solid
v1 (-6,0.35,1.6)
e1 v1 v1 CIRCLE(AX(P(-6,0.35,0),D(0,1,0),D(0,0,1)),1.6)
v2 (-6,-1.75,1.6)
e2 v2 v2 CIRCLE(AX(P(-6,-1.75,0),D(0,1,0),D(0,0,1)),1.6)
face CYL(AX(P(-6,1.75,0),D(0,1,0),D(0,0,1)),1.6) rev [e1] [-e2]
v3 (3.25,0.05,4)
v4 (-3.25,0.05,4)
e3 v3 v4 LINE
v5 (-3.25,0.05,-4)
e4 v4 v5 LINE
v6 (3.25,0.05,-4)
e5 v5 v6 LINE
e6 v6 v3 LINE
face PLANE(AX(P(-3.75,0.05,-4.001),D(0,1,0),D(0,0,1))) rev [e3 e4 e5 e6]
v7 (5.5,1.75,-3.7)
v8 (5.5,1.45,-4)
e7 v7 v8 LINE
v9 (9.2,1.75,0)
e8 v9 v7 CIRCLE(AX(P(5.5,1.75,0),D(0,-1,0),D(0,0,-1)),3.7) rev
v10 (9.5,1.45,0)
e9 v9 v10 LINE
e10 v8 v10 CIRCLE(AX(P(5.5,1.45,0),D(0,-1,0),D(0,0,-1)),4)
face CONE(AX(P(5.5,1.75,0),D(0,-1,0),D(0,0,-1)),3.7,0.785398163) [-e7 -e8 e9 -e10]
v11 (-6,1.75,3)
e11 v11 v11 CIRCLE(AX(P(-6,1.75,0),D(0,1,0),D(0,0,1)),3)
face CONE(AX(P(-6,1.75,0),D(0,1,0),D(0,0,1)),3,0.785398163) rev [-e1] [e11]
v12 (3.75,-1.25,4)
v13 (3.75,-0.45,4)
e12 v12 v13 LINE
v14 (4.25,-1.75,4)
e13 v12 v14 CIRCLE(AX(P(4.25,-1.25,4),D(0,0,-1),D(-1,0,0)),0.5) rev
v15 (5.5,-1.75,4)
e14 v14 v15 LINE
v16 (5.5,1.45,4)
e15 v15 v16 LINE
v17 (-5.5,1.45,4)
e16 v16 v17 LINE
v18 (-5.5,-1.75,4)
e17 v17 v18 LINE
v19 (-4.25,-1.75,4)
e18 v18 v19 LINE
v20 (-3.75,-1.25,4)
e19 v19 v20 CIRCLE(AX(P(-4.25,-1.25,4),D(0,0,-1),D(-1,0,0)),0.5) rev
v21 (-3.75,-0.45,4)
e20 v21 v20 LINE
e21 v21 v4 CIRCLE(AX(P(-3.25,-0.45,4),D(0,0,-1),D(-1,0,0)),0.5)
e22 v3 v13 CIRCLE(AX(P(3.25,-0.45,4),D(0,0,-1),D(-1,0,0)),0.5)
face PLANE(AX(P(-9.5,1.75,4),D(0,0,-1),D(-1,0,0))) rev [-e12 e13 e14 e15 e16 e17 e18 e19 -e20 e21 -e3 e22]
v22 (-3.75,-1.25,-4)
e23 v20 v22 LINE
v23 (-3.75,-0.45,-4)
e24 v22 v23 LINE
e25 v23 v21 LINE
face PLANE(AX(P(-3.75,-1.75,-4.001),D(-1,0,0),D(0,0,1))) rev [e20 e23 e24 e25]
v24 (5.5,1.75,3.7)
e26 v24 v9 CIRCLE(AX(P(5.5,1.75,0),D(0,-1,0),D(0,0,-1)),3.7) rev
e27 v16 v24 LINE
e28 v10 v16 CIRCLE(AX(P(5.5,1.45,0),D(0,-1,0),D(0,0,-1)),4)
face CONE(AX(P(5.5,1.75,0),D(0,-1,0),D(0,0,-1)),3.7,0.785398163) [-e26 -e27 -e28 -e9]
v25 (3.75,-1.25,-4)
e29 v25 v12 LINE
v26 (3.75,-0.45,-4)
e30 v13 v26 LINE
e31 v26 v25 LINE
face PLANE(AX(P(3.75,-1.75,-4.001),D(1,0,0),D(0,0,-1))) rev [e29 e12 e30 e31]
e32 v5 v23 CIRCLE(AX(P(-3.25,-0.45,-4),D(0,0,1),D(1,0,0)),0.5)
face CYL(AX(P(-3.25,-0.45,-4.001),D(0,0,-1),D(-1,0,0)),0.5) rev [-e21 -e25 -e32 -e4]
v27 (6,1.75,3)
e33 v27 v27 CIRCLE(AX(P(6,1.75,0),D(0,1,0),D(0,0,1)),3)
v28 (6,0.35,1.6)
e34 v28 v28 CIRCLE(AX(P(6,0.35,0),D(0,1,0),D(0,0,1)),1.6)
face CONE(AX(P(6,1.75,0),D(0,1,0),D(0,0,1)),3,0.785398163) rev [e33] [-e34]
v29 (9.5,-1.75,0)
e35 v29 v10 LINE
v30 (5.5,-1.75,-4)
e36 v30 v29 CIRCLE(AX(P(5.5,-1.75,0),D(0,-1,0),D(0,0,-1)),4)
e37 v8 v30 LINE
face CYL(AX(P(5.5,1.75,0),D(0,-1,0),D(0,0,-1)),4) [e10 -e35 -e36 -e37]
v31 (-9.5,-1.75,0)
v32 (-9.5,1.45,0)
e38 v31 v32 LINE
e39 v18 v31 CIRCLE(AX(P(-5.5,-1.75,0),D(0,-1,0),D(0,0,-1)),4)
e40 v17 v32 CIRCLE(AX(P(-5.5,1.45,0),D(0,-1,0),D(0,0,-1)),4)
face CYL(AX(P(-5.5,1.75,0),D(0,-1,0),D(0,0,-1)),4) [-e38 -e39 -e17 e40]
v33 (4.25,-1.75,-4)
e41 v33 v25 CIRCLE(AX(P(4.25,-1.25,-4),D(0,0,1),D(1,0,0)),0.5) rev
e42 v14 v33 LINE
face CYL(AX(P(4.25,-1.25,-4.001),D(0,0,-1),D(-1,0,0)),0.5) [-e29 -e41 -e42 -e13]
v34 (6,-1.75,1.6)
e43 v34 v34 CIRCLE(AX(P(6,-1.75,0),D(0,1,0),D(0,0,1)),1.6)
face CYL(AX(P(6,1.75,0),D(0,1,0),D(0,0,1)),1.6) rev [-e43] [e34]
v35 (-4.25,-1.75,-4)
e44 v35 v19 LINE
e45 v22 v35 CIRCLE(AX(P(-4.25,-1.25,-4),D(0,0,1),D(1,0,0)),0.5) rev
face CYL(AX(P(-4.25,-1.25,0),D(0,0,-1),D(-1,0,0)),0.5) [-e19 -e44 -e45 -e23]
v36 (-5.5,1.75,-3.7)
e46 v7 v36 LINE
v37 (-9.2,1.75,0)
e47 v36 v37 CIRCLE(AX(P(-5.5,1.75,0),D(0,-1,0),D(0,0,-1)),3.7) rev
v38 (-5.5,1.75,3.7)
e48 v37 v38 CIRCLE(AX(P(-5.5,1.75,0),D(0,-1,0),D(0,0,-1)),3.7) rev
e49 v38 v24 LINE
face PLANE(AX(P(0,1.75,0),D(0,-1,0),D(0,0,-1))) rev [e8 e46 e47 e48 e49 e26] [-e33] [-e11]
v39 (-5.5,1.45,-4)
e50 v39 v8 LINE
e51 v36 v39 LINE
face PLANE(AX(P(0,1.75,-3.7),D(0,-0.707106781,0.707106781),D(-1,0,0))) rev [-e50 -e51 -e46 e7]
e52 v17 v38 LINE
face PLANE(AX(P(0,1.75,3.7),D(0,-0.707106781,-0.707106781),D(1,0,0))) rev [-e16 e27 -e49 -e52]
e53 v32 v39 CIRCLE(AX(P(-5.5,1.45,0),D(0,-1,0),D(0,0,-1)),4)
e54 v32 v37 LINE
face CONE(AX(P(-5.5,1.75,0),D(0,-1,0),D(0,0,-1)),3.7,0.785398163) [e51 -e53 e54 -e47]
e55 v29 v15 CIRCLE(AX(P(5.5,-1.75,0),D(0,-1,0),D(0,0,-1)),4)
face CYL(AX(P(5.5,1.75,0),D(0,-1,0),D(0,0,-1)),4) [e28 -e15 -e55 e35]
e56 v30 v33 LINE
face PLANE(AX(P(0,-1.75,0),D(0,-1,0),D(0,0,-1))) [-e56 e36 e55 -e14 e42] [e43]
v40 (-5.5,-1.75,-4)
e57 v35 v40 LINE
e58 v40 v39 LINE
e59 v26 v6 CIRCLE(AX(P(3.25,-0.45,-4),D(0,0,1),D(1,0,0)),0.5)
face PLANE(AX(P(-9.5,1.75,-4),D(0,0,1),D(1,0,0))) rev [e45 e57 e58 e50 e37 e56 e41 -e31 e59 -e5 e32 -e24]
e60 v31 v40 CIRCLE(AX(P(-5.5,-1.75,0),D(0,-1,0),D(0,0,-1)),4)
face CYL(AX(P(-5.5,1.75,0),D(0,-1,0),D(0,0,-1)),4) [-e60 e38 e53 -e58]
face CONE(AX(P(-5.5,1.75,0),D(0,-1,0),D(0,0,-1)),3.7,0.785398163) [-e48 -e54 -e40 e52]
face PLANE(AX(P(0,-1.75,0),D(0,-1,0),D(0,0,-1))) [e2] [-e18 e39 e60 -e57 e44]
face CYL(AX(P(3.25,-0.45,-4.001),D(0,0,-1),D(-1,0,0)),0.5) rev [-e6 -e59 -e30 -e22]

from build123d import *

# Parameters (mm, degrees)
SKETCH_1_W                   = 19
SKETCH_1_H                   = 8
EXTRUDE_1_DEPTH              = 1.75
CUT_EXTRUDE_1_REACH          = 14.542
SKETCH_2_W                   = 7.5
SKETCH_2_H                   = 1.8
HOLE_WIZARD_M3_1_D           = 3.2
HOLE_WIZARD_M3_1_CSINK_D     = 6
HOLE_WIZARD_M3_1_CSINK_ANGLE = 90
FILLET_2_R                   = 4
FILLET_3_R                   = 0.5
CHAMFER_1_SIZE               = 0.3


with BuildPart() as part:
    # 草图1 → 凸台-拉伸1 (new, symmetric)
    with BuildSketch(Plane(origin=(0, 0, 0), x_dir=(1, 0, 0), z_dir=(0, 1, 0))):
        Rectangle(SKETCH_1_W, SKETCH_1_H)
    extrude(amount=EXTRUDE_1_DEPTH, both=True)

    # 草图2 → 切除-拉伸1 (cut, up to next)
    with BuildSketch(Plane.XY.offset(4), mode=Mode.PRIVATE) as cut_extrude_1_sk1:
        with Locations((0, -0.85)):
            Rectangle(SKETCH_2_W, SKETCH_2_H)
    cut_extrude_1_tool1 = extrude(cut_extrude_1_sk1.sketch, amount=-CUT_EXTRUDE_1_REACH, mode=Mode.PRIVATE) & part.part
    add(cut_extrude_1_tool1.solids().sort_by_distance((0, -0.85, 4))[0], mode=Mode.SUBTRACT)

    # M3 十字槽半沉头木螺钉的锥形沉头孔1 (through all)
    with Locations(Plane(origin=(0, 1.75, 0), x_dir=(1, 0, 0), z_dir=(0, 1, 0))):
        with Locations((6, 0), (-6, 0)):
            CounterSinkHole(HOLE_WIZARD_M3_1_D / 2, HOLE_WIZARD_M3_1_CSINK_D / 2, counter_sink_angle=HOLE_WIZARD_M3_1_CSINK_ANGLE)

    # 圆角2
    fillet_2_edges = [part.edges().sort_by_distance(p)[0] for p in [
        (9.5, 0, 4),
        (-9.5, 0, -4),
        (9.5, 0, -4),
        (-9.5, 0, 4),
    ]]
    fillet(fillet_2_edges, radius=FILLET_2_R - 0.0001)  # a hair under: the kernel refuses the full size

    # 圆角3
    fillet_3_edges = [part.edges().sort_by_distance(p)[0] for p in [
        (3.75, 0.05, 0),
        (3.75, -1.75, 0),
        (-3.75, -1.75, 0),
        (-3.75, 0.05, 0),
    ]]
    fillet(fillet_3_edges, radius=FILLET_3_R)

    # 倒角1
    chamfer_1_edges = [part.edges().sort_by_distance(p)[0] for p in [
        (0, 1.75, 4),
        (0, 1.75, -4),
        (-8.328456414, 1.75, 2.828456414),
        (-8.328456414, 1.75, -2.828456414),
        (8.328456414, 1.75, -2.828456414),
        (8.328456414, 1.75, 2.828456414),
    ]]
    chamfer(chamfer_1_edges, length=CHAMFER_1_SIZE)


solid = part.part
